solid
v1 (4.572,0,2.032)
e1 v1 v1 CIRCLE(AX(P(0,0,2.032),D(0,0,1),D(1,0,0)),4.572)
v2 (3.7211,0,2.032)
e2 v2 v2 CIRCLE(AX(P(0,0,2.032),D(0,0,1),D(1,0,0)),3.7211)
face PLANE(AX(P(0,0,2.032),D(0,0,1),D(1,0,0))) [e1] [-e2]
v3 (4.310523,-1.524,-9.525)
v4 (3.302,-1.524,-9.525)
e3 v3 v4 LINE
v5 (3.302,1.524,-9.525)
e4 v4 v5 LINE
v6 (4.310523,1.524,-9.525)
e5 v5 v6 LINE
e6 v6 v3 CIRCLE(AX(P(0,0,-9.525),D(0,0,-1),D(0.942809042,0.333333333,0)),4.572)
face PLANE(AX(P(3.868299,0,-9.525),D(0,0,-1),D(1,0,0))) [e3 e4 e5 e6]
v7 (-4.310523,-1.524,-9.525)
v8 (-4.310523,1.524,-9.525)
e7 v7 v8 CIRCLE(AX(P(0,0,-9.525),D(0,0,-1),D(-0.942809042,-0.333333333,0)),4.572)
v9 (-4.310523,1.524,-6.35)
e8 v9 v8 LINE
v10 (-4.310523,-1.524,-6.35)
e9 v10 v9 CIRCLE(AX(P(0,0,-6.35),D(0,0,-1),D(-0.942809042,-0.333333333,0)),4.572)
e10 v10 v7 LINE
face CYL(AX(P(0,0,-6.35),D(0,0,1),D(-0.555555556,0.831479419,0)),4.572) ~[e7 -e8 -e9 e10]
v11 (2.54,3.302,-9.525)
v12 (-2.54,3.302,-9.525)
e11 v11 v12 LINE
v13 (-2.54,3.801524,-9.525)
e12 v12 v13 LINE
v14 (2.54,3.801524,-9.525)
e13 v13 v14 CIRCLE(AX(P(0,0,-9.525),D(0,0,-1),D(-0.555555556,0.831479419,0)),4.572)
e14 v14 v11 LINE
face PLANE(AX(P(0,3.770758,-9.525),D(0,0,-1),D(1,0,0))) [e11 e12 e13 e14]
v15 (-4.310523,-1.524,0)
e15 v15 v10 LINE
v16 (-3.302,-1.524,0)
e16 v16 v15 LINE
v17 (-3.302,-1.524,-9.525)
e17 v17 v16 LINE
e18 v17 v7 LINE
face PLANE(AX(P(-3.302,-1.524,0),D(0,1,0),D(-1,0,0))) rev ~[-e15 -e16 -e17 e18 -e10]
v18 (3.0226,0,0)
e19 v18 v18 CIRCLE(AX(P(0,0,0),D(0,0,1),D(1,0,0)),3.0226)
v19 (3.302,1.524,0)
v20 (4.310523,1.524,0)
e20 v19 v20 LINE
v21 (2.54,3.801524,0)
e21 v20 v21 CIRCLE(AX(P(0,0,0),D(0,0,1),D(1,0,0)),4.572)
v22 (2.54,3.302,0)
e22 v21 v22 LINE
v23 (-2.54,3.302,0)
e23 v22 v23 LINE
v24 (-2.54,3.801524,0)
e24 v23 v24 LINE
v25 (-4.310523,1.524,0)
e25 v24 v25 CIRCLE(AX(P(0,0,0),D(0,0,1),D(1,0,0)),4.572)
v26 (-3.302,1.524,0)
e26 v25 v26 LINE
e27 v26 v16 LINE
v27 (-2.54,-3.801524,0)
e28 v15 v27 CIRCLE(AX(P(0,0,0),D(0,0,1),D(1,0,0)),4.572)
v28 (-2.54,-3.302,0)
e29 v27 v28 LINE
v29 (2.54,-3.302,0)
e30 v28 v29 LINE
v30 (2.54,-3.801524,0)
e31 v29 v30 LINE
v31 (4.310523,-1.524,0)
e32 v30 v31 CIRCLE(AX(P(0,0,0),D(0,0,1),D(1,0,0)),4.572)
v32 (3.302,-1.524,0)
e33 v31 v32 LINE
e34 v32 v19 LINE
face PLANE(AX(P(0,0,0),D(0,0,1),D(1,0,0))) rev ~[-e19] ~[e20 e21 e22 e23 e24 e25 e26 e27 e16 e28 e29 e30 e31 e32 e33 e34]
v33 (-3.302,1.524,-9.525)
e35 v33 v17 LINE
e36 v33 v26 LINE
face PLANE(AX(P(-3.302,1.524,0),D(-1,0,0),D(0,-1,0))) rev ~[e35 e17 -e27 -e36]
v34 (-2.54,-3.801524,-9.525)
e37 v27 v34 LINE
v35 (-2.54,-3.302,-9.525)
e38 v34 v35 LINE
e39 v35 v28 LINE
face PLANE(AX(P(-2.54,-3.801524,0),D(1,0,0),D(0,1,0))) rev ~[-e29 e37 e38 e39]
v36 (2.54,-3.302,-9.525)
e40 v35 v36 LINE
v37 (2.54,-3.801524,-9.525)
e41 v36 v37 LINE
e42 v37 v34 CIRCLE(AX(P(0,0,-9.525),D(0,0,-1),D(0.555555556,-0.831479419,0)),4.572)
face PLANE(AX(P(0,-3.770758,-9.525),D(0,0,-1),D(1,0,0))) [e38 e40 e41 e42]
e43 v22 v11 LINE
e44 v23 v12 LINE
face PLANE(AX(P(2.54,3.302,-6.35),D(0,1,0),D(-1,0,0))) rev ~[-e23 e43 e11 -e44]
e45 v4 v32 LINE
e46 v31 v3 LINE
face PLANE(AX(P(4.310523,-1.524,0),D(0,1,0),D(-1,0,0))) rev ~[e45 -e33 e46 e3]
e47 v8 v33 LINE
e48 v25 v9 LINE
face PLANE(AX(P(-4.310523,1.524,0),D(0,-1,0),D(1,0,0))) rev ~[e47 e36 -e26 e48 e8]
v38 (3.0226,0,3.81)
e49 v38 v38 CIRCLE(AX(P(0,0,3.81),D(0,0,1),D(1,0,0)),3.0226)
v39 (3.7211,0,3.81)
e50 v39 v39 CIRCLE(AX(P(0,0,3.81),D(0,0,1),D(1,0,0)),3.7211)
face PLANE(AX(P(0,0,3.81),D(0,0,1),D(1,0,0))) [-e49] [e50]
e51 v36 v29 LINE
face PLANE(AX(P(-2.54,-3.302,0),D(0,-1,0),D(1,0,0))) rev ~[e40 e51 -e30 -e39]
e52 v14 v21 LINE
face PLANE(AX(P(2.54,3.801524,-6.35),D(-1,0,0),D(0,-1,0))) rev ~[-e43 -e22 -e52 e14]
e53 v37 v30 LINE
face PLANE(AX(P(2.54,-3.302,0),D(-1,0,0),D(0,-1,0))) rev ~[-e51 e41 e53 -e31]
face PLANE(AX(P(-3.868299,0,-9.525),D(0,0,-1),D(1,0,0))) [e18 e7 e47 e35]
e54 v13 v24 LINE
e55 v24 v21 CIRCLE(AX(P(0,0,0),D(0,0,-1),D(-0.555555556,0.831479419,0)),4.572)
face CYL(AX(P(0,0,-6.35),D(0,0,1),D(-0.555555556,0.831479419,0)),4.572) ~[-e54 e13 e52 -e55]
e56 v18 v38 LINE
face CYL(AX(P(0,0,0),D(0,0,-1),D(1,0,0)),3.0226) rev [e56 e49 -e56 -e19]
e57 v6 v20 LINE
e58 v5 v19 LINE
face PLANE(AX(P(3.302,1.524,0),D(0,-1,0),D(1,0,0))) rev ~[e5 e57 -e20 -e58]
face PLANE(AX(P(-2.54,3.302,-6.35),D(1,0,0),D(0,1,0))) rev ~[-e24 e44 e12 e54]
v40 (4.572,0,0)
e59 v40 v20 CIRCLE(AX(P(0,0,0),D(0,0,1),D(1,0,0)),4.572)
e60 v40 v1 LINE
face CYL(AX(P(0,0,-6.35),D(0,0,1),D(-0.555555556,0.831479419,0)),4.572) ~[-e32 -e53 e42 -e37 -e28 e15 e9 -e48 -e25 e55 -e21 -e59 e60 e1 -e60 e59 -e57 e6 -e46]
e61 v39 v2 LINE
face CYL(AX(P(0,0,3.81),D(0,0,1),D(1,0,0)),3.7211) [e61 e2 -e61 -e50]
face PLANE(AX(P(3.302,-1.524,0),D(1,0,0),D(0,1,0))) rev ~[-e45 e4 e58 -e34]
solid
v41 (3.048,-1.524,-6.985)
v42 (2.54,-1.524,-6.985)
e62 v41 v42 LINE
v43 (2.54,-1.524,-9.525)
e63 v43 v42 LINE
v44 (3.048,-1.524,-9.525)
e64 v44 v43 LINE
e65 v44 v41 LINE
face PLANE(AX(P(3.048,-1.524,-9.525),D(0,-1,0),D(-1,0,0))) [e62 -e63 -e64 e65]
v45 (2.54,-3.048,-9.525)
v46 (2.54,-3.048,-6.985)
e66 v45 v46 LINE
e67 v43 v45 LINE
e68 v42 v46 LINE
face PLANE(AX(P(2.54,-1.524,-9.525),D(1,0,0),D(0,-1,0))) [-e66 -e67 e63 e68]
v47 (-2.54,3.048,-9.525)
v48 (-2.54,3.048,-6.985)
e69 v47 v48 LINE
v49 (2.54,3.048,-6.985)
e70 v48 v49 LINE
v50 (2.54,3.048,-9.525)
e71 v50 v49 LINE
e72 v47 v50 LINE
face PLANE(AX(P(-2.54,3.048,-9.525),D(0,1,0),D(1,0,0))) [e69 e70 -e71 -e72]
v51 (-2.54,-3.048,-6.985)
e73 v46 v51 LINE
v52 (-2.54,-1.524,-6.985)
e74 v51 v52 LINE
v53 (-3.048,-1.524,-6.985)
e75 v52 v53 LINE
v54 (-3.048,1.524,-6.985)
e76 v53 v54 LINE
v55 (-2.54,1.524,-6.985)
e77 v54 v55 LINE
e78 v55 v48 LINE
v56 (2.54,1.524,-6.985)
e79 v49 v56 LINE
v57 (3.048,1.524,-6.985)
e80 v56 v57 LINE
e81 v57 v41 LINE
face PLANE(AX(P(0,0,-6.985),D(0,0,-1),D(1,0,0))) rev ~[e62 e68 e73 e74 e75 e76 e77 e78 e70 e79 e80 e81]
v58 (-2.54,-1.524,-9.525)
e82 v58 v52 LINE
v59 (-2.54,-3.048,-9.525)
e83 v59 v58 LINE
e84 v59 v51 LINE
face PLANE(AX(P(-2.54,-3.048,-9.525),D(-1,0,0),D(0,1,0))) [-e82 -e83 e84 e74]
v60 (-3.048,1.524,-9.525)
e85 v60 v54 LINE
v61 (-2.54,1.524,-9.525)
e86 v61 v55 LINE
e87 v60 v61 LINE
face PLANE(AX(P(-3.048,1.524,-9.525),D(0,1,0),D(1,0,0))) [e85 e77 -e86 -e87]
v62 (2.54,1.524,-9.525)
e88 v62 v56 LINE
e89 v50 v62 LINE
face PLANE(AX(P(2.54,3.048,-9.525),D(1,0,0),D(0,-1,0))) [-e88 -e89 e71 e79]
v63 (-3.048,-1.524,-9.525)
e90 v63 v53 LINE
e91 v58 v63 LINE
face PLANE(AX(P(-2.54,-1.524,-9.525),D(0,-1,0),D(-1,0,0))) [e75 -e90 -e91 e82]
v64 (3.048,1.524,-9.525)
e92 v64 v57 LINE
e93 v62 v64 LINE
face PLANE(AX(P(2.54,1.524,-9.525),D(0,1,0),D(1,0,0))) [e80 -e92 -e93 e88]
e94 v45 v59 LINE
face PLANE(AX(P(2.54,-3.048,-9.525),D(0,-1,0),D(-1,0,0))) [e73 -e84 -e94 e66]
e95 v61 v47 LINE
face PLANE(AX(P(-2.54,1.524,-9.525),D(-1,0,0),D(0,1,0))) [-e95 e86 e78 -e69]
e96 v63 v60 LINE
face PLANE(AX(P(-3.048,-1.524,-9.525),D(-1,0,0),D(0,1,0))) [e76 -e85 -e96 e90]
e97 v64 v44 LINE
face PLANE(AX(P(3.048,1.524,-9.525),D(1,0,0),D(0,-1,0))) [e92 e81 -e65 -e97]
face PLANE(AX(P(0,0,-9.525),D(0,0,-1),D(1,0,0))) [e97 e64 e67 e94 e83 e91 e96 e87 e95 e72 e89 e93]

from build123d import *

# Parameters (mm, degrees)
F0_R      = 4.572
F0_R_2    = 3.0226
F1_DEPTH  = 3.81
F2_R      = 4.572
F2_R_2    = 3.7211
F3_DEPTH  = 1.778
F5_DEPTH  = 6.35
F6_DEPTH  = 3.175
F8_DEPTH  = 2.54
F11_DEPTH = 6.35
F13_DEPTH = 3.175
F14_R     = 4.8244158916
F15_DEPTH = 3.175


# Not quite as in the source:
# - after a boolean that leaves OpenCascade's solid faulty, fix() repairs it


with BuildPart() as f1:
    # F0 (on Top) → F1 (new body)
    with BuildSketch(Plane.XY):
        Circle(F0_R)
        Circle(F0_R_2, mode=Mode.SUBTRACT)
    extrude(amount=F1_DEPTH)

    # F2 (on face) → F3 (cut)
    with BuildSketch(Plane.XY.offset(3.81)):
        Circle(F2_R)
        Circle(F2_R_2, mode=Mode.SUBTRACT)
    extrude(amount=-F3_DEPTH, mode=Mode.SUBTRACT)

    # F4 (on face) → F5 (join)
    with BuildSketch(Plane(origin=(0, 0, 0), x_dir=(1, 0, 0), z_dir=(0, 0, -1))):
        with BuildLine():
            Line((-3.302, 1.524), (-4.3105229381, 1.524))
            ThreePointArc((-4.3105229381, 1.524), (-4.572, 0), (-4.3105229381, -1.524))
            Line((-4.3105229381, -1.524), (-3.302, -1.524))
            Line((-3.302, -1.524), (-3.302, 1.524))
        make_face()
        with BuildLine():
            Line((-2.54, 3.302), (2.54, 3.302))
            Line((2.54, 3.302), (2.54, 3.801523905))
            ThreePointArc((2.54, 3.801523905), (0, 4.572), (-2.54, 3.801523905))
            Line((-2.54, 3.801523905), (-2.54, 3.302))
        make_face()
        with BuildLine():
            Line((4.3105229381, 1.524), (3.302, 1.524))
            Line((3.302, 1.524), (3.302, -1.524))
            Line((3.302, -1.524), (4.3105229381, -1.524))
            ThreePointArc((4.3105229381, -1.524), (4.572, 0), (4.3105229381, 1.524))
        make_face()
        with BuildLine():
            Line((2.54, -3.801523905), (2.54, -3.302))
            Line((2.54, -3.302), (-2.54, -3.302))
            Line((-2.54, -3.302), (-2.54, -3.801523905))
            ThreePointArc((-2.54, -3.801523905), (0, -4.572), (2.54, -3.801523905))
        make_face()
    extrude(amount=F5_DEPTH)

    add(f1.part.fix(), mode=Mode.REPLACE)

    # F6 (add): faces of the model
    f6_faces = [f1.faces().sort_by_distance(p)[0] for p in [
        (0, 3.838335495, -6.35),
        (0, -3.838335495, -6.35),
        (-3.8964762164, 0, -6.35),
        (3.8964762164, 0, -6.35),
    ]]
    extrude(f6_faces, amount=F6_DEPTH)


with BuildPart() as f8:
    # F7 (on face) → F8 (new body)
    with BuildSketch(Plane(origin=(0, 0, -9.525), x_dir=(1, 0, 0), z_dir=(0, 0, -1))):
        Polygon((-2.54, 1.524), (-3.048, 1.524), (-3.048, -1.524), (-2.54, -1.524), (-2.54, -3.048), (2.54, -3.048), (2.54, -1.524), (3.048, -1.524), (3.048, 1.524), (2.54, 1.524), (2.54, 3.048), (-2.54, 3.048), align=None)
    extrude(amount=-F8_DEPTH)


with BuildPart() as f11:
    # F10 (on offset) → F11 (new body)
    with BuildSketch(Plane.XY.offset(-25.4)):
        with BuildLine():
            Line((-6.5659403285, 8.1975422484), (-4.0371337642, 3.8175207966))
            ThreePointArc((-4.0371337642, 3.8175207966), (-5.55625, 0), (-4.0371337642, -3.8175207966))
            Line((-4.0371337642, -3.8175207966), (-6.5659403285, -8.1975422484))
            Line((-6.5659403285, -8.1975422484), (-3.8163096715, -9.7850422484))
            Line((-3.8163096715, -9.7850422484), (-1.2875031072, -5.4050207966))
            ThreePointArc((-1.2875031072, -5.4050207966), (2.778125, -4.8118536498), (5.3246368714, -1.5875))
            Line((5.3246368714, -1.5875), (10.38225, -1.5875))
            Line((10.38225, -1.5875), (10.38225, 1.5875))
            Line((10.38225, 1.5875), (5.3246368714, 1.5875))
            ThreePointArc((5.3246368714, 1.5875), (2.778125, 4.8118536498), (-1.2875031072, 5.4050207966))
            Line((-1.2875031072, 5.4050207966), (-3.8163096715, 9.7850422484))
            Line((-3.8163096715, 9.7850422484), (-6.5659403285, 8.1975422484))
        make_face()
        with BuildLine():
            ThreePointArc((2.794, -3.9330080976), (0, -4.8244158916), (-2.794, -3.9330080976))
            Line((-2.794, -3.9330080976), (-2.794, -2.794))
            Line((-2.794, -2.794), (2.794, -2.794))
            Line((2.794, -2.794), (2.794, -3.9330080976))
        make_face(mode=Mode.SUBTRACT)
        with BuildLine():
            Line((-4.4850030606, 1.7775646942), (-2.7929016728, 1.7775646942))
            Line((-2.7929016728, 1.7775646942), (-2.7929016728, -1.7775646942))
            Line((-2.7929016728, -1.7775646942), (-4.4850030606, -1.7775646942))
            ThreePointArc((-4.4850030606, -1.7775646942), (-4.8244158916, 0), (-4.4850030606, 1.7775646942))
        make_face(mode=Mode.SUBTRACT)
        with BuildLine():
            Line((2.794, 2.794), (-2.794, 2.794))
            Line((-2.794, 2.794), (-2.794, 3.9330080976))
            ThreePointArc((-2.794, 3.9330080976), (0, 4.8244158916), (2.794, 3.9330080976))
            Line((2.794, 3.9330080976), (2.794, 2.794))
        make_face(mode=Mode.SUBTRACT)
        with BuildLine():
            Line((4.4850030606, -1.7775646942), (2.7929016728, -1.7775646942))
            Line((2.7929016728, -1.7775646942), (2.7929016728, 1.7775646942))
            Line((2.7929016728, 1.7775646942), (4.4850030606, 1.7775646942))
            ThreePointArc((4.4850030606, 1.7775646942), (4.8244158916, 0), (4.4850030606, -1.7775646942))
        make_face(mode=Mode.SUBTRACT)
    extrude(amount=F11_DEPTH)

    # F12 (on face) → F13 (join)
    with BuildSketch(Plane.XY.offset(-19.05)):
        with BuildLine():
            Line((10.38225, -1.5875), (10.38225, 1.5875))
            Line((10.38225, 1.5875), (5.3246368714, 1.5875))
            ThreePointArc((5.3246368714, 1.5875), (2.778125, 4.8118536498), (-1.2875031072, 5.4050207966))
            Line((-1.2875031072, 5.4050207966), (-3.8163096715, 9.7850422484))
            Line((-3.8163096715, 9.7850422484), (-6.5659403285, 8.1975422484))
            Line((-6.5659403285, 8.1975422484), (-4.0371337642, 3.8175207966))
            ThreePointArc((-4.0371337642, 3.8175207966), (-5.55625, 0), (-4.0371337642, -3.8175207966))
            Line((-4.0371337642, -3.8175207966), (-6.5659403285, -8.1975422484))
            Line((-6.5659403285, -8.1975422484), (-3.8163096715, -9.7850422484))
            Line((-3.8163096715, -9.7850422484), (-1.2875031072, -5.4050207966))
            ThreePointArc((-1.2875031072, -5.4050207966), (2.778125, -4.8118536498), (5.3246368714, -1.5875))
            Line((5.3246368714, -1.5875), (10.38225, -1.5875))
        make_face()
        with BuildLine():
            ThreePointArc((3.9330080976, -2.794), (0, -4.8244158916), (-3.9330080976, -2.794))
            Line((-3.9330080976, -2.794), (3.9330080976, -2.794))
        make_face(mode=Mode.SUBTRACT)
        with BuildLine():
            Line((4.4850030606, -1.7775646942), (-4.4850030606, -1.7775646942))
            ThreePointArc((-4.4850030606, -1.7775646942), (-4.8244158916, 0), (-4.4850030606, 1.7775646942))
            Line((-4.4850030606, 1.7775646942), (4.4850030606, 1.7775646942))
            ThreePointArc((4.4850030606, 1.7775646942), (4.8244158916, 0), (4.4850030606, -1.7775646942))
        make_face(mode=Mode.SUBTRACT)
        with BuildLine():
            Line((3.9330080976, 2.794), (-3.9330080976, 2.794))
            ThreePointArc((-3.9330080976, 2.794), (0, 4.8244158916), (3.9330080976, 2.794))
        make_face(mode=Mode.SUBTRACT)
    extrude(amount=F13_DEPTH)

    # F14 (on face) → F15 (join)
    with BuildSketch(Plane.XY.offset(-15.875)):
        with BuildLine():
            Line((10.38225, -1.5875), (10.38225, 1.5875))
            Line((10.38225, 1.5875), (5.3246368714, 1.5875))
            ThreePointArc((5.3246368714, 1.5875), (2.778125, 4.8118536498), (-1.2875031072, 5.4050207966))
            Line((-1.2875031072, 5.4050207966), (-3.8163096715, 9.7850422484))
            Line((-3.8163096715, 9.7850422484), (-6.5659403285, 8.1975422484))
            Line((-6.5659403285, 8.1975422484), (-4.0371337642, 3.8175207966))
            ThreePointArc((-4.0371337642, 3.8175207966), (-5.55625, 0), (-4.0371337642, -3.8175207966))
            Line((-4.0371337642, -3.8175207966), (-6.5659403285, -8.1975422484))
            Line((-6.5659403285, -8.1975422484), (-3.8163096715, -9.7850422484))
            Line((-3.8163096715, -9.7850422484), (-1.2875031072, -5.4050207966))
            ThreePointArc((-1.2875031072, -5.4050207966), (2.778125, -4.8118536498), (5.3246368714, -1.5875))
            Line((5.3246368714, -1.5875), (10.38225, -1.5875))
        make_face()
        Circle(F14_R, mode=Mode.SUBTRACT)
    extrude(amount=F15_DEPTH)


solid = Compound([f1.part, f8.part])
